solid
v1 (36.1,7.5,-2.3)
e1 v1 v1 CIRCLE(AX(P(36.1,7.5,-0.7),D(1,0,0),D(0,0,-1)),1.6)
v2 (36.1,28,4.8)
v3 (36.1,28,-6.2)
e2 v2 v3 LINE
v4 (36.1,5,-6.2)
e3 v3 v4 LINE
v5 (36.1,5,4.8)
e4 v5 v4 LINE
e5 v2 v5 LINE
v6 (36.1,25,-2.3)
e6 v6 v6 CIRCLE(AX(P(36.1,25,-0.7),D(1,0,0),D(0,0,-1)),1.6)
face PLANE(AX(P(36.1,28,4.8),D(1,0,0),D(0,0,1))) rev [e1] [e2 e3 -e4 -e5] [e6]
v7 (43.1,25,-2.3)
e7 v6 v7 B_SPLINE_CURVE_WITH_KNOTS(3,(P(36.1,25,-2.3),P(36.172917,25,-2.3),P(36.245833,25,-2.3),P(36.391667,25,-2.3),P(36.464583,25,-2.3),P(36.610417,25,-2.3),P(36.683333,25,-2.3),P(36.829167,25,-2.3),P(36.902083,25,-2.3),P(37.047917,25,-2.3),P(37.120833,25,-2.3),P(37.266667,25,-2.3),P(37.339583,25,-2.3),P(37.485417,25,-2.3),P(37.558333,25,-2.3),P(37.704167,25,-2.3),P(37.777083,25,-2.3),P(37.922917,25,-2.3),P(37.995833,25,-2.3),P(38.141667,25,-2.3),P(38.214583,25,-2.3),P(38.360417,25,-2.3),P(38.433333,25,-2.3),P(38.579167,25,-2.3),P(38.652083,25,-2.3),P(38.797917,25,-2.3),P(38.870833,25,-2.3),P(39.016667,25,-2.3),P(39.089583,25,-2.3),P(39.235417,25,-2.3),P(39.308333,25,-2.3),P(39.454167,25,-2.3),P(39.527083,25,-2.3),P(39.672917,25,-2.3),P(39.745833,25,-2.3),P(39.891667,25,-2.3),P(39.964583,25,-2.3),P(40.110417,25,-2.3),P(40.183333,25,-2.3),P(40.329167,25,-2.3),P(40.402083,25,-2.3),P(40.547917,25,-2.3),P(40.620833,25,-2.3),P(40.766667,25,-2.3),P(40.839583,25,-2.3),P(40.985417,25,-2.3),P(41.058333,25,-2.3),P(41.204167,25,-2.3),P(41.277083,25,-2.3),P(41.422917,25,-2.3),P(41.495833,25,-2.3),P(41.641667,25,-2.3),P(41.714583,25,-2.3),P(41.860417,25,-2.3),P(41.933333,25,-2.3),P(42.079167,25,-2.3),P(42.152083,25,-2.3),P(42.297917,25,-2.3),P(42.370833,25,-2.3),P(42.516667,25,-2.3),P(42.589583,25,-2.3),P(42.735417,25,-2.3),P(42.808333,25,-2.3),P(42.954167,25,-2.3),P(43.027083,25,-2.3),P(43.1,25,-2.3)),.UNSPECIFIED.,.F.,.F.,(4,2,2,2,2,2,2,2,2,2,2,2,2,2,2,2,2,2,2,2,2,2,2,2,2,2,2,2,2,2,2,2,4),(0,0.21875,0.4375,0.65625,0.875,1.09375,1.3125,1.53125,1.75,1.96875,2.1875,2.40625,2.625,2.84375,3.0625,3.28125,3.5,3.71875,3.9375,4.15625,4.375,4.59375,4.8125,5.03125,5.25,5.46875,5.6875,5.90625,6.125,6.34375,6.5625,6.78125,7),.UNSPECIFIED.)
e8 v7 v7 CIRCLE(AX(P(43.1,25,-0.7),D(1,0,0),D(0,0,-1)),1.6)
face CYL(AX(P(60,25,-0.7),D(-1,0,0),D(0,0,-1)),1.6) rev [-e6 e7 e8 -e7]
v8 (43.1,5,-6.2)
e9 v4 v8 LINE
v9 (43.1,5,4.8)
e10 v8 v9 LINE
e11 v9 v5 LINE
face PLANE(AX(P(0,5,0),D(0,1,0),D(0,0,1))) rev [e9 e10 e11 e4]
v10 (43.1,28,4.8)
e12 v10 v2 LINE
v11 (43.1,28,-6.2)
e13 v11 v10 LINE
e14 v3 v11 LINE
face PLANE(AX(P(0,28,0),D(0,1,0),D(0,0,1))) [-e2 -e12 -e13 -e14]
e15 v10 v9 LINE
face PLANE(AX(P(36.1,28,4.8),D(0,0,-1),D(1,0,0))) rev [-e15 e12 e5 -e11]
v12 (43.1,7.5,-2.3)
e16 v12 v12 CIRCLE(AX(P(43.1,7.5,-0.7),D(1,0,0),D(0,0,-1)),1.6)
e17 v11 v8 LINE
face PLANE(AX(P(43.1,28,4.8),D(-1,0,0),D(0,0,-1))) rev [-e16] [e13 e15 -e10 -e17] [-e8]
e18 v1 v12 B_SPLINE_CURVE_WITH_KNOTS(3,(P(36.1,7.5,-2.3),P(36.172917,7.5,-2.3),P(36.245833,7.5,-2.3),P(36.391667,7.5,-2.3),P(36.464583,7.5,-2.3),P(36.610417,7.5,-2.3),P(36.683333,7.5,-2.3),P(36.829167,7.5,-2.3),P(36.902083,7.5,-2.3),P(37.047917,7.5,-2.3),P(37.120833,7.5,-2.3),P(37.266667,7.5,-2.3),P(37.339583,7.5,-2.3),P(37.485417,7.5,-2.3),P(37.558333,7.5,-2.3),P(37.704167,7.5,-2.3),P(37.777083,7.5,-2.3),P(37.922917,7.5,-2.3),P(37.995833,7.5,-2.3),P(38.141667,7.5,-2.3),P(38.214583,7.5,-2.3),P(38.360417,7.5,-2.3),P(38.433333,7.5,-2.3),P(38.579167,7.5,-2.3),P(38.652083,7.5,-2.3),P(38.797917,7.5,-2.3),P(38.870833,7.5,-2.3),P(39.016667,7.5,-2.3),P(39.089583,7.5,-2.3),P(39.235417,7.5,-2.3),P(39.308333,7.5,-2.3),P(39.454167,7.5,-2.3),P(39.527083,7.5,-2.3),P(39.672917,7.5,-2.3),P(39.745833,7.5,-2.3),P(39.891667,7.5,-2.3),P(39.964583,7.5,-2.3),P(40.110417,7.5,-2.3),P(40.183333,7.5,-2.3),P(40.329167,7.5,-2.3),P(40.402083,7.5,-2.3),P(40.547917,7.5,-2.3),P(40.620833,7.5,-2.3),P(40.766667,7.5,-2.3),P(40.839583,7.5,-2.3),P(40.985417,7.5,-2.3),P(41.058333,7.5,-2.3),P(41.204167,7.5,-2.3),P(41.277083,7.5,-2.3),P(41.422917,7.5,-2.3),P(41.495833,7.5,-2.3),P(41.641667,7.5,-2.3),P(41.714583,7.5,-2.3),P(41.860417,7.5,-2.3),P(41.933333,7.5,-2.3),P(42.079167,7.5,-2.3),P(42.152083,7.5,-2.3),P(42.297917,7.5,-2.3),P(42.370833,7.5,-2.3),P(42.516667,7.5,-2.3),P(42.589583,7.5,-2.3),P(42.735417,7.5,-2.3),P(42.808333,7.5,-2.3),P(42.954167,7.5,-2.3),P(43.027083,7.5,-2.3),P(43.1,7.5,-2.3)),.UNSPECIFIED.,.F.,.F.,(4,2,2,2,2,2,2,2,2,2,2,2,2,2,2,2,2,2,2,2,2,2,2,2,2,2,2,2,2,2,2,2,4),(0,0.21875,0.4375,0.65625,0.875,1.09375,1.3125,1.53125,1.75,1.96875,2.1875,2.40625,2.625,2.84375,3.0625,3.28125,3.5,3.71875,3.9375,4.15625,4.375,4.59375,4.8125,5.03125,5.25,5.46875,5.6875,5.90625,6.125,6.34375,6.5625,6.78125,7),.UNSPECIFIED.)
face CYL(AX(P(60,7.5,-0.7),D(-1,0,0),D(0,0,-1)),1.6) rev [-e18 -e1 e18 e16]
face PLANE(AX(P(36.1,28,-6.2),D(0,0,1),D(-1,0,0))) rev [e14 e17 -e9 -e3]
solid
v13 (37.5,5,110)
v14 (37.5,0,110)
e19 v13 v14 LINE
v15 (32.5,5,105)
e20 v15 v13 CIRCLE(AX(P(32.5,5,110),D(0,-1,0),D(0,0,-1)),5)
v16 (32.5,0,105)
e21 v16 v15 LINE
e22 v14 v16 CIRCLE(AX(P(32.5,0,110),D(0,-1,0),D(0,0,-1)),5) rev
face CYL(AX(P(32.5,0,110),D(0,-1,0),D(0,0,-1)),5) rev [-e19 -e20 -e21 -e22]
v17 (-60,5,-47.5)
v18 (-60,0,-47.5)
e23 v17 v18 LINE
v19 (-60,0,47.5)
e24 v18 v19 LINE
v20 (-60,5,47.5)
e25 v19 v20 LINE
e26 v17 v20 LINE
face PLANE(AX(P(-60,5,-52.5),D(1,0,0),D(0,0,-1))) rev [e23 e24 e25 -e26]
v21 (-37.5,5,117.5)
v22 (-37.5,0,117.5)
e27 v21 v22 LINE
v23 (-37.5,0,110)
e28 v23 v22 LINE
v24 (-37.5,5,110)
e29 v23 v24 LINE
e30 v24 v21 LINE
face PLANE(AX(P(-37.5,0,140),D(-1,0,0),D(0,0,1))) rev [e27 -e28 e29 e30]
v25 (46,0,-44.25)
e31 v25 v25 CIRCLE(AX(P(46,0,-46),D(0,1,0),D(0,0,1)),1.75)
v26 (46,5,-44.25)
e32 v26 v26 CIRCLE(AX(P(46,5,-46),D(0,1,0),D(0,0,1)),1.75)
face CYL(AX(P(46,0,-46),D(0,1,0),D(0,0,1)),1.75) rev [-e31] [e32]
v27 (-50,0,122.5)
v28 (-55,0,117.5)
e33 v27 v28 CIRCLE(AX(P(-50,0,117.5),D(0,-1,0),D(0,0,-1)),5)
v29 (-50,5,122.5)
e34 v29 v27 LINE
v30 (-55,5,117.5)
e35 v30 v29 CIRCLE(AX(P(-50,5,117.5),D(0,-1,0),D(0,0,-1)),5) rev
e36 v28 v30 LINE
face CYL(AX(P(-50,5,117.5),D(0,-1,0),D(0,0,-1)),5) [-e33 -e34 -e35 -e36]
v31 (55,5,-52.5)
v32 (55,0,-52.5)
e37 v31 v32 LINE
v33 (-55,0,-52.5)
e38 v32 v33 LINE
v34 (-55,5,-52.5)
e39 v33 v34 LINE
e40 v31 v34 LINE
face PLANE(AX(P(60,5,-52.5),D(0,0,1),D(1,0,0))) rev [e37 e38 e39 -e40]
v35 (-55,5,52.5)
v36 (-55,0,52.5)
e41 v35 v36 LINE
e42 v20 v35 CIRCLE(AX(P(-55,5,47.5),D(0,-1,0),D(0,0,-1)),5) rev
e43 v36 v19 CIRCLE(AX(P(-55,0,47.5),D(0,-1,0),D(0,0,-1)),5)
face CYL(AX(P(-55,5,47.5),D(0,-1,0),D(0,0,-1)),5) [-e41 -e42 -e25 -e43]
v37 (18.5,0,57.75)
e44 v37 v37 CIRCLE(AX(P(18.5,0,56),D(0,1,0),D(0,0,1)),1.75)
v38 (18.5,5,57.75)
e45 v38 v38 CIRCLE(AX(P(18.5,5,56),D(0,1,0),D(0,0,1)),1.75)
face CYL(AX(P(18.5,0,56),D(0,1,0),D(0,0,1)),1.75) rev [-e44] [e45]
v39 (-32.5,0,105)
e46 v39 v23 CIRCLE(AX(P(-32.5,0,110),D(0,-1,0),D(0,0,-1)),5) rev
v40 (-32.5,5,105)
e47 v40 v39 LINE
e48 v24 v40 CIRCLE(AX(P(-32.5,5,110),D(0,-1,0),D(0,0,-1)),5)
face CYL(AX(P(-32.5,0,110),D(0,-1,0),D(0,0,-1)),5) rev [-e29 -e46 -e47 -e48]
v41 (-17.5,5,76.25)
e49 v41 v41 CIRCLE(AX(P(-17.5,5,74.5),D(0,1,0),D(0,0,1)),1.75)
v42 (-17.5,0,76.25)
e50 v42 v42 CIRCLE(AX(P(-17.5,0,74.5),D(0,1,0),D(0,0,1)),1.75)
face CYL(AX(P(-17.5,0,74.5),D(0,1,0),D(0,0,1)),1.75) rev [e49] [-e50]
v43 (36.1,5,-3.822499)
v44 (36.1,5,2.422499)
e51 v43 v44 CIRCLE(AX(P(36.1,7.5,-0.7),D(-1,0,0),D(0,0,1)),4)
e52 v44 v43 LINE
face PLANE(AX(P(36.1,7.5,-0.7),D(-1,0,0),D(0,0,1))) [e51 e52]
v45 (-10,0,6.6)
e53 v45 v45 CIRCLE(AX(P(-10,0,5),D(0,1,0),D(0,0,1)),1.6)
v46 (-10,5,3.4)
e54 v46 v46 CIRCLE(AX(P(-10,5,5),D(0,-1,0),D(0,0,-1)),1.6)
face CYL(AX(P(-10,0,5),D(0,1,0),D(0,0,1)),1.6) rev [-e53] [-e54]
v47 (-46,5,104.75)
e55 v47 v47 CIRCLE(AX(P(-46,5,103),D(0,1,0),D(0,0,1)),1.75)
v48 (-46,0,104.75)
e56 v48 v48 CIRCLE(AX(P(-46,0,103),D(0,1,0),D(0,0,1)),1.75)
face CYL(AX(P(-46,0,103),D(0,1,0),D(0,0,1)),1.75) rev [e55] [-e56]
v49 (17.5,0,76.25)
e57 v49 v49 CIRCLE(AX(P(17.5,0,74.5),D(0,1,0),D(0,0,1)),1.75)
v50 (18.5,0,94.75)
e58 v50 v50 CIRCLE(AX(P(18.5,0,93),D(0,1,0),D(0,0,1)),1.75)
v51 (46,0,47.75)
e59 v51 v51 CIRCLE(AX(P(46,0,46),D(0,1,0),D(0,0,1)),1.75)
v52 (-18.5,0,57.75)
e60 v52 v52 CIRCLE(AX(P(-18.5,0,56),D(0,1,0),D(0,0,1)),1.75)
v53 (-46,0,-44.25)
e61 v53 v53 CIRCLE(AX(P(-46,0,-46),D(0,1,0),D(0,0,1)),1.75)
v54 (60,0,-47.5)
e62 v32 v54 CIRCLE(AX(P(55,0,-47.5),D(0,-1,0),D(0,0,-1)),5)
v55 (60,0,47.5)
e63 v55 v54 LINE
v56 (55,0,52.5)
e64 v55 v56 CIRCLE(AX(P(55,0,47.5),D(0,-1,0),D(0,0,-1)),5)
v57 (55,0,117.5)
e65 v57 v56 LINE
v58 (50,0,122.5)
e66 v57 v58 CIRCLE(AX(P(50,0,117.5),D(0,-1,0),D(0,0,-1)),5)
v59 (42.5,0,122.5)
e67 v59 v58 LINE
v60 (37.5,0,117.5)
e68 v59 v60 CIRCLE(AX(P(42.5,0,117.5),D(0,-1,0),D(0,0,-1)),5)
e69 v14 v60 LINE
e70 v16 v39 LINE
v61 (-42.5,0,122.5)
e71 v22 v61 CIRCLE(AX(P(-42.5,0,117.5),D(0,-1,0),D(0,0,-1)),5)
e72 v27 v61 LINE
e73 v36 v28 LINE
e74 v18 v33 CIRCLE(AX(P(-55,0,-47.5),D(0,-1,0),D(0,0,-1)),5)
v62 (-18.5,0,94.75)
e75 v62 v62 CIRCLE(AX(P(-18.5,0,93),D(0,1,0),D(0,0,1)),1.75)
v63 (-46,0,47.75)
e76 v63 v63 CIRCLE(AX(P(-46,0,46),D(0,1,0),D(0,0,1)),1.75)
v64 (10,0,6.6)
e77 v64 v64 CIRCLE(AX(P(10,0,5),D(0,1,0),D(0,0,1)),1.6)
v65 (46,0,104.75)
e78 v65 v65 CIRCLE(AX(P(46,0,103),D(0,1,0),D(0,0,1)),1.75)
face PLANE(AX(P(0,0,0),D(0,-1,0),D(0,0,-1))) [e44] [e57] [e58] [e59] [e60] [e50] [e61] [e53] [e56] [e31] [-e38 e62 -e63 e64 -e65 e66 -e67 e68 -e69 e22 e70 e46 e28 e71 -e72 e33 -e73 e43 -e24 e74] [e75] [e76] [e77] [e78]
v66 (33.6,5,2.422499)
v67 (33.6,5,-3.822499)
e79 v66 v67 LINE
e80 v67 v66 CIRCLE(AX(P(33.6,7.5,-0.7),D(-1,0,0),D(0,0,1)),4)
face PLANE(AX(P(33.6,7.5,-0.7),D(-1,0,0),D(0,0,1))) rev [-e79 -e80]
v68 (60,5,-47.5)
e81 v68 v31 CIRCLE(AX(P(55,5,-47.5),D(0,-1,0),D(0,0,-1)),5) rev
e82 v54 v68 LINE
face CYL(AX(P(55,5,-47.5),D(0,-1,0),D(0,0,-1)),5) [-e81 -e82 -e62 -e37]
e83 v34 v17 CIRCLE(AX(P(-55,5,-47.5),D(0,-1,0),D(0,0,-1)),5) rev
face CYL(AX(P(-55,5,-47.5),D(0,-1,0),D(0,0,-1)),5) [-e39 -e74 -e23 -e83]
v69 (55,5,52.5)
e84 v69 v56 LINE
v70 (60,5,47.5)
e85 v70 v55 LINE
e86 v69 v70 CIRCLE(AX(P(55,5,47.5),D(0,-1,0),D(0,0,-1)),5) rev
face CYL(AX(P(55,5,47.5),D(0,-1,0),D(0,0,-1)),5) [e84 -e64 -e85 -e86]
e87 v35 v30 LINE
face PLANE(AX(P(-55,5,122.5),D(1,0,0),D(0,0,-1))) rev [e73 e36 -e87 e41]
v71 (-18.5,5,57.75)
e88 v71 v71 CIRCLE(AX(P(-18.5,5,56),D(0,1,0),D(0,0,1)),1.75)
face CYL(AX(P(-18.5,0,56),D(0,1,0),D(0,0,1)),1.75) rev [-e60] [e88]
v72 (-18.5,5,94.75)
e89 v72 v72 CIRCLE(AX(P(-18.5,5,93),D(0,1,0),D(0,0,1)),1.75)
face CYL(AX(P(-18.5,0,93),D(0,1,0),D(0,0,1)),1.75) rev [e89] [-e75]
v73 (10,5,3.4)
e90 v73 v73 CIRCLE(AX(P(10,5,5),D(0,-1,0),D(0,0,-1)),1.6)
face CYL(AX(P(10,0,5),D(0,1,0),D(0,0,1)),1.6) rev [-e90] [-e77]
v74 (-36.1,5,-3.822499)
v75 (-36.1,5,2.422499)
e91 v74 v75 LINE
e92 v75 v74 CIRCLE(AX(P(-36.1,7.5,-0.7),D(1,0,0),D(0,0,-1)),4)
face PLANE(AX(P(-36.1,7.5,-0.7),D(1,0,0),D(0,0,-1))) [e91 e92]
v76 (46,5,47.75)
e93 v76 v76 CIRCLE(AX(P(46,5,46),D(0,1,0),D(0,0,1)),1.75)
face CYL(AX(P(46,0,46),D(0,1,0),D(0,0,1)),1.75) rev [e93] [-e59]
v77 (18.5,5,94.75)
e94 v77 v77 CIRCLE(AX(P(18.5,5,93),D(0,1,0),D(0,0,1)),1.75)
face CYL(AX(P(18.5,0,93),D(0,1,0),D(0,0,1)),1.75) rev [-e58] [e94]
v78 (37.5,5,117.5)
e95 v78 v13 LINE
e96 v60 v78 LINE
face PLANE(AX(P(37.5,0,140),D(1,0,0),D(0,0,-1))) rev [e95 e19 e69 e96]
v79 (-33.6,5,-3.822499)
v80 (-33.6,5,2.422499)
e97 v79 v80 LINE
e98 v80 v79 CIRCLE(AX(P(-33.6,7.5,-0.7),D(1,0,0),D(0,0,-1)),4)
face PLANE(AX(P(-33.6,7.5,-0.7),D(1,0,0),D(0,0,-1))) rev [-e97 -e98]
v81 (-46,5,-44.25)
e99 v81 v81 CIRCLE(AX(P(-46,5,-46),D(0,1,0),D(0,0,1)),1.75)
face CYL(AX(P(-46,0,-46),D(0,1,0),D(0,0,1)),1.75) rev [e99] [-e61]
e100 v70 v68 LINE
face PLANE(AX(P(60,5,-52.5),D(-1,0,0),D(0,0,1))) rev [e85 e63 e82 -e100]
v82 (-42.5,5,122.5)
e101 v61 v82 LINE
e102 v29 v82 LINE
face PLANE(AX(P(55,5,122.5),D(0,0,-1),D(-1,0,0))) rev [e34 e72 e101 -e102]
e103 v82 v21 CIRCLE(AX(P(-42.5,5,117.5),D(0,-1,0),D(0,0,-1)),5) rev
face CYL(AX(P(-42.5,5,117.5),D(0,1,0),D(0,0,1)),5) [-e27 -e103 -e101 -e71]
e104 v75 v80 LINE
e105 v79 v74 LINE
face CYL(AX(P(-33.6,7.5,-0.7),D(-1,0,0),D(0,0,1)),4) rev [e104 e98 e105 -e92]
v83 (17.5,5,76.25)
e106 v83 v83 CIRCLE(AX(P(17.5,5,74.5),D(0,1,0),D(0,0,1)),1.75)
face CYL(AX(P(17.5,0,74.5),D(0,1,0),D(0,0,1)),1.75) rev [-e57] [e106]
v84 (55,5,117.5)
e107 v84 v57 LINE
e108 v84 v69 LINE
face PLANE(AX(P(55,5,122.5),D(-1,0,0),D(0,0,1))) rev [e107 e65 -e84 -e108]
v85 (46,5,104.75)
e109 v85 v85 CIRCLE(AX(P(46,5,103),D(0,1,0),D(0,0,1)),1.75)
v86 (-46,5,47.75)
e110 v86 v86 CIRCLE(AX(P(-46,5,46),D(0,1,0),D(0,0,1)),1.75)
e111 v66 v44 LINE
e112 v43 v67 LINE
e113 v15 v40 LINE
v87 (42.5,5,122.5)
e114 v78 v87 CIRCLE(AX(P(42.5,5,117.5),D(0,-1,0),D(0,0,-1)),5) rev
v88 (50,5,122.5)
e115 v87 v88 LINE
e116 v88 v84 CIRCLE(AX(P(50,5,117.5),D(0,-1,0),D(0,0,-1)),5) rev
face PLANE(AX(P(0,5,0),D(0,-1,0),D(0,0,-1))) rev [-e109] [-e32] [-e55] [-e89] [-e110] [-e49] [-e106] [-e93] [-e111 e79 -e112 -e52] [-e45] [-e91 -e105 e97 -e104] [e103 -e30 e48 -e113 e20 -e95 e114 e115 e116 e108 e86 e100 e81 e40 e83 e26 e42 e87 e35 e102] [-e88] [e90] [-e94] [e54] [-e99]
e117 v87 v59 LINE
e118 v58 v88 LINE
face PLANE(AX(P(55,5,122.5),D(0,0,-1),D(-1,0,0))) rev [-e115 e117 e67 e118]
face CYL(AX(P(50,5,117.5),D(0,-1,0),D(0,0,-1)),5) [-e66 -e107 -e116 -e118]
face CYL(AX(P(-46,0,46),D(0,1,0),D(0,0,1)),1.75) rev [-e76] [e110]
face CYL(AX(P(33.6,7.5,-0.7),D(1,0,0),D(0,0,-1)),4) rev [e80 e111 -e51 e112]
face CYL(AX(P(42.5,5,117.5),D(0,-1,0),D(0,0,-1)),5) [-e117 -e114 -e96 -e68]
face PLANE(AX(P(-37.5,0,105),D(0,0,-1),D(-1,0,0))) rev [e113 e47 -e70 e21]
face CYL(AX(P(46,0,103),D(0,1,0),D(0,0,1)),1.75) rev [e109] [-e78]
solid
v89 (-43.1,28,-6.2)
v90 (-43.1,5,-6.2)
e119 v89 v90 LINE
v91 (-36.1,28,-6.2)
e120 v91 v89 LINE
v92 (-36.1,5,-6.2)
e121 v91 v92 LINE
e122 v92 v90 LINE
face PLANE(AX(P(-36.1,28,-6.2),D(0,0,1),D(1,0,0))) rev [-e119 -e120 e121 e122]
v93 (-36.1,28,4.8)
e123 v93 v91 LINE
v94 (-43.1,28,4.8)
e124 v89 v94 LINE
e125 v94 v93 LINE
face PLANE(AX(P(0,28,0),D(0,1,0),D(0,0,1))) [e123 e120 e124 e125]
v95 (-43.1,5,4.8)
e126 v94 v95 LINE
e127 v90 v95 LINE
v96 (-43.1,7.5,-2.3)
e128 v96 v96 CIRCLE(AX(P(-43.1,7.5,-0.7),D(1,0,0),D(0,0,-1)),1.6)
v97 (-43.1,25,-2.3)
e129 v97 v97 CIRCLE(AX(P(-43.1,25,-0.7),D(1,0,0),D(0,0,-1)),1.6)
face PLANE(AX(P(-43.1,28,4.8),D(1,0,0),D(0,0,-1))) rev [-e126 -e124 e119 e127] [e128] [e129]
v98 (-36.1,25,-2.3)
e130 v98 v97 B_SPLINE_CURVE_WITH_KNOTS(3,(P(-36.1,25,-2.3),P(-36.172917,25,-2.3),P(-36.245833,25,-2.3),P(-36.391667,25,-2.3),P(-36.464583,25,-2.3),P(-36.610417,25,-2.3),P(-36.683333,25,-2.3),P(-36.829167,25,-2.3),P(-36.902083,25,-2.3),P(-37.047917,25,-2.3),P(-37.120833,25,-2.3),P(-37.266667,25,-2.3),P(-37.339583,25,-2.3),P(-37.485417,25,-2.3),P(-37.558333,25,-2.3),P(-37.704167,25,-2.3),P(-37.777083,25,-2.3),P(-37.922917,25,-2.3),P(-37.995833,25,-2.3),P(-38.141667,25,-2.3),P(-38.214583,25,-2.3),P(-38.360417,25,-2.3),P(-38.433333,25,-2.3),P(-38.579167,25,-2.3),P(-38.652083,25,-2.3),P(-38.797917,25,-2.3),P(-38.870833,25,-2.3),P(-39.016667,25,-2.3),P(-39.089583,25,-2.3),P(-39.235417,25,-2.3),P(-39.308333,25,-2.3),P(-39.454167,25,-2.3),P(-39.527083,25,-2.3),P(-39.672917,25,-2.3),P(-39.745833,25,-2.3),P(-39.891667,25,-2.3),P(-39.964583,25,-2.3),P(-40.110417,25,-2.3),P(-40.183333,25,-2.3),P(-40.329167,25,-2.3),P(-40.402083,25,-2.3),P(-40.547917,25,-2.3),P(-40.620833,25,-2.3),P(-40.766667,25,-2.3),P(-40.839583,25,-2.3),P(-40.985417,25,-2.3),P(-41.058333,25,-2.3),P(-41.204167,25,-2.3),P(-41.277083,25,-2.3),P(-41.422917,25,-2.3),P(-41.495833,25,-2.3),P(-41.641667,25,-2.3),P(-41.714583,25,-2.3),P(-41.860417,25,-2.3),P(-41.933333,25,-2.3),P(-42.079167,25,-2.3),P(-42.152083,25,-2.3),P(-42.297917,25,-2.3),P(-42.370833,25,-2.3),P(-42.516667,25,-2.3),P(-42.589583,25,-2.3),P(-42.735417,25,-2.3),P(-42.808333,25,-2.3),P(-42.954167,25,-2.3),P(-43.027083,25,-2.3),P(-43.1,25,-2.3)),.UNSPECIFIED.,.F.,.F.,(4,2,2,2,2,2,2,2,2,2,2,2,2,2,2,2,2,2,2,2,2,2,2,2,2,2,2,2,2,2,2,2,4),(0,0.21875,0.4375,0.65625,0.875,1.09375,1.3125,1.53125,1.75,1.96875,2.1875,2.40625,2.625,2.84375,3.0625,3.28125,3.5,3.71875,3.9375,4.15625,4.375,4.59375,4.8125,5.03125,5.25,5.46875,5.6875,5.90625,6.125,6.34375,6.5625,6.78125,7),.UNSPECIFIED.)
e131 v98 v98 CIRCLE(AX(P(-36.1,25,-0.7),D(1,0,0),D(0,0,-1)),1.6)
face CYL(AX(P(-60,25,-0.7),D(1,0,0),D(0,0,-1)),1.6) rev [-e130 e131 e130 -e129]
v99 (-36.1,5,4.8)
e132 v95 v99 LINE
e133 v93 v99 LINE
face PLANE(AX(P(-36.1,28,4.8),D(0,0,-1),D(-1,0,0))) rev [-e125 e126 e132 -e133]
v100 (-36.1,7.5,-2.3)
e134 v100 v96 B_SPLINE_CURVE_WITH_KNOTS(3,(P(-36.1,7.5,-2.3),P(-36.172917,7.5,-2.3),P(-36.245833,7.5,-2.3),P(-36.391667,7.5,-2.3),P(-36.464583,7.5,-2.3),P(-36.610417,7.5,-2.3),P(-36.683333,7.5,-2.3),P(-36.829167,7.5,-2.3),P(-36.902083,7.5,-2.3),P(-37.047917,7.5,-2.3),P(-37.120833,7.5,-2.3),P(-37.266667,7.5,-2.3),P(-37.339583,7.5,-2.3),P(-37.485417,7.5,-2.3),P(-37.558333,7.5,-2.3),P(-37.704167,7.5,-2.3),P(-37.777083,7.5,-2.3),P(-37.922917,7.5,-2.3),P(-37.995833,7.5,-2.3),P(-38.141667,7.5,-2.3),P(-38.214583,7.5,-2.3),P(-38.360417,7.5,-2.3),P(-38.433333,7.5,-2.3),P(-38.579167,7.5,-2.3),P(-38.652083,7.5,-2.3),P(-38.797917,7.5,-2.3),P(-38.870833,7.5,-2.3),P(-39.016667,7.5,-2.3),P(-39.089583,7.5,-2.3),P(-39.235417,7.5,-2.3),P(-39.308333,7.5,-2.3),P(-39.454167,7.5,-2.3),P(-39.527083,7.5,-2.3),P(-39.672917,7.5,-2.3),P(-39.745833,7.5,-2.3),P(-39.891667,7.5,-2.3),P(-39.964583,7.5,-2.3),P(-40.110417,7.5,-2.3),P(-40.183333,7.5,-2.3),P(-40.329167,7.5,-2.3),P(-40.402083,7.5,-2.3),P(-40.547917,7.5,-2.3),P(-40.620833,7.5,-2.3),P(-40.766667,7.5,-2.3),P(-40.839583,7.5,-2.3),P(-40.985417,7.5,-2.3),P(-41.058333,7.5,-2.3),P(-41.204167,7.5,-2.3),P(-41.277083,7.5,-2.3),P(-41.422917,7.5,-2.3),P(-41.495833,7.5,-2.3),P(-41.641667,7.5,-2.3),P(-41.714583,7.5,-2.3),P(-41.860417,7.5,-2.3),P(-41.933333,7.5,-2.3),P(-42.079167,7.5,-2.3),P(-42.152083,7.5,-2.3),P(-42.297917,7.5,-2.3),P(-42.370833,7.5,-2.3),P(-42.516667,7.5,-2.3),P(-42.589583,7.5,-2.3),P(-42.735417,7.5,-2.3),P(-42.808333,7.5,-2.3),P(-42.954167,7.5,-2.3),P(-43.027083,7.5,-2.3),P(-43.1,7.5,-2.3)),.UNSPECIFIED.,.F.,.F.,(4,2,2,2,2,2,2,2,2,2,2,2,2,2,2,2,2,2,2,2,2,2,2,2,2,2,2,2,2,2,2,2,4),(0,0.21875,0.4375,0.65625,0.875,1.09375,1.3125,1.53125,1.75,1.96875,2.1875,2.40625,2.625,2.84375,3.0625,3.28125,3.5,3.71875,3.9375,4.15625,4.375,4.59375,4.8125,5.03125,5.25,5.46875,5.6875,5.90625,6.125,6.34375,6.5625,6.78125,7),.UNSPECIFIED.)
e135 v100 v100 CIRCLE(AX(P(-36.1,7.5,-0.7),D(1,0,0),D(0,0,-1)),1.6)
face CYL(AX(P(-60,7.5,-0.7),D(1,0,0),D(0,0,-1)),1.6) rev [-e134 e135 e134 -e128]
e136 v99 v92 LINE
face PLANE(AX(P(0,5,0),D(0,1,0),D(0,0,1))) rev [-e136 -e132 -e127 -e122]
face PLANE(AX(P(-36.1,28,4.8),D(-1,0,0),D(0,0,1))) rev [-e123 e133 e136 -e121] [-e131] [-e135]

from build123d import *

# Parameters (mm, degrees)
EXTRUDE_1_DEPTH             = 5
SKETCH_2_W                  = 7
SKETCH_2_H                  = 11
EXTRUDE_2_DEPTH             = 23
SKETCH_3_R                  = 1.6
CUT_EXTRUDE_1_DEPTH         = 159.19437411
SKETCH_5_R                  = 1.75
CUT_EXTRUDE_1416_DEPTH      = 139.330220849
SKETCH2_R                   = 4
CUT_EXTRUDE1_DEPTH          = 2.5
CUT_EXTRUDE2_START          = 2.5
SKETCH3_R                   = 4
CUT_EXTRUDE2_DEPTH          = 2.5
CUT_EXTRUDE_2297_DEPTH      = 139.330220849
CUT_EXTRUDE_2297_DEPTH_BACK = 139.330220849
SKETCH4_R                   = 1.6
SKETCH6_R                   = 1.75
CUT_EXTRUDE_2671_DEPTH      = 139.330220849
SKETCH7_R                   = 1.75
CUT_EXTRUDE_3080_DEPTH      = 139.330220849
SKETCH9_R                   = 1.75
CUT_EXTRUDE_3618_DEPTH      = 139.330220849
SKETCH8_W                   = 75
SKETCH8_H                   = 35
CUT_EXTRUDE7_DEPTH          = 139.330220849
FILLET_1_R                  = 5
FILLET2_R                   = 5


with BuildPart() as part:
    # 스케치1 → 보스-돌출1 (new body)
    with BuildSketch(Plane(origin=(0, 0, 0), x_dir=(1, 0, 0), z_dir=(0, 1, 0))):
        Polygon((-55, -52.5), (-60, -52.5), (-60, 52.5), (60, 52.5), (60, -52.5), (55, -52.5), (55, -122.5), (-55, -122.5), align=None)
    extrude(amount=EXTRUDE_1_DEPTH)

    # 스케치5 → Cut-Extrude 1416 (cut, through all)
    with BuildSketch(Plane(origin=(0, 5, 0), x_dir=(1, 0, 0), z_dir=(0, 1, 0))):
        with Locations(Location((-46, -46, 0), (0, 0, 270))):
            Circle(SKETCH_5_R)
        with Locations(Location((-46, 46, 0), (0, 0, 270))):
            Circle(SKETCH_5_R)
        with Locations(Location((46, 46, 0), (0, 0, 270))):
            Circle(SKETCH_5_R)
        with Locations(Location((46, -46, 0), (0, 0, 270))):
            Circle(SKETCH_5_R)
    extrude(amount=-CUT_EXTRUDE_1416_DEPTH, mode=Mode.SUBTRACT)

    # Sketch2 → Cut-Extrude1 (cut)
    with BuildSketch(Plane.ZY.offset(-36.1)):
        with Locations((-0.7, 7.5)):
            Circle(SKETCH2_R)
    extrude(amount=CUT_EXTRUDE1_DEPTH, mode=Mode.SUBTRACT)

    # Sketch3 → Cut-Extrude2 (cut)
    with BuildSketch(Plane(origin=(-36.1, 0, 0), x_dir=(0, 0, -1), z_dir=(1, 0, 0)).offset(CUT_EXTRUDE2_START)):
        with Locations((0.7, 7.5)):
            Circle(SKETCH3_R)
    extrude(amount=-CUT_EXTRUDE2_DEPTH, mode=Mode.SUBTRACT)

    # Sketch4 → Cut-Extrude 2297 (cut, two sides: drawn at the far end of the back side and taken through both)
    with BuildSketch(Plane(origin=(0, 5, 0), x_dir=(1, 0, 0), z_dir=(0, 1, 0)).offset(-CUT_EXTRUDE_2297_DEPTH_BACK)):
        with Locations(Location((-10, -5, 0), (0, 0, 270))):
            Circle(SKETCH4_R)
        with Locations(Location((10, -5, 0), (0, 0, 270))):
            Circle(SKETCH4_R)
    extrude(amount=CUT_EXTRUDE_2297_DEPTH + CUT_EXTRUDE_2297_DEPTH_BACK, mode=Mode.SUBTRACT)

    # Sketch6 → Cut-Extrude 2671 (cut, through all)
    with BuildSketch(Plane(origin=(0, 5, 0), x_dir=(1, 0, 0), z_dir=(0, 1, 0))):
        with Locations(Location((-18.5, -93, 0), (0, 0, 270))):
            Circle(SKETCH6_R)
        with Locations(Location((-18.5, -56, 0), (0, 0, 270))):
            Circle(SKETCH6_R)
        with Locations(Location((18.5, -56, 0), (0, 0, 270))):
            Circle(SKETCH6_R)
        with Locations(Location((18.5, -93, 0), (0, 0, 270))):
            Circle(SKETCH6_R)
    extrude(amount=-CUT_EXTRUDE_2671_DEPTH, mode=Mode.SUBTRACT)

    # Sketch7 → Cut-Extrude 3080 (cut, through all)
    with BuildSketch(Plane(origin=(0, 5, 0), x_dir=(1, 0, 0), z_dir=(0, 1, 0))):
        with Locations(Location((-46, -103, 0), (0, 0, 270))):
            Circle(SKETCH7_R)
        with Locations(Location((46, -103, 0), (0, 0, 270))):
            Circle(SKETCH7_R)
    extrude(amount=-CUT_EXTRUDE_3080_DEPTH, mode=Mode.SUBTRACT)

    # Sketch9 → Cut-Extrude 3618 (cut, through all)
    with BuildSketch(Plane(origin=(0, 5, 0), x_dir=(1, 0, 0), z_dir=(0, 1, 0))):
        with Locations(Location((-17.5, -74.5, 0), (0, 0, 270))):
            Circle(SKETCH9_R)
        with Locations(Location((17.5, -74.5, 0), (0, 0, 270))):
            Circle(SKETCH9_R)
    extrude(amount=-CUT_EXTRUDE_3618_DEPTH, mode=Mode.SUBTRACT)

    # Sketch8 → Cut-Extrude7 (cut, through all)
    with BuildSketch(Plane(origin=(0, 5, 0), x_dir=(1, 0, 0), z_dir=(0, 1, 0))):
        with Locations((0, -122.5)):
            Rectangle(SKETCH8_W, SKETCH8_H)
    extrude(amount=-CUT_EXTRUDE7_DEPTH, mode=Mode.SUBTRACT)

    # 필렛1
    fillet_1_edges = [part.edges().sort_by_distance(p)[0] for p in [
        (37.5, 2.5, 122.5),
        (37.5, 2.5, 105),
        (-37.5, 2.5, 122.5),
        (-37.5, 2.5, 105),
        (-60, 2.5, -52.5),
        (60, 2.5, -52.5),
        (55, 2.5, 122.5),
        (-55, 2.5, 122.5),
    ]]
    fillet(fillet_1_edges, radius=FILLET_1_R)

    # Fillet2
    fillet2_edges = [part.edges().sort_by_distance(p)[0] for p in [
        (60, 2.5, 52.5),
        (-60, 2.5, 52.5),
    ]]
    fillet(fillet2_edges, radius=FILLET2_R - 0.0001)  # a hair under: the kernel refuses the full size


with BuildPart() as body_2:
    # 스케치2 → 보스-돌출2 (new body)
    with BuildSketch(Plane(origin=(0, 5, 0), x_dir=(1, 0, 0), z_dir=(0, 1, 0))):
        with Locations((-39.6, 0.7)):
            Rectangle(SKETCH_2_W, SKETCH_2_H)
    extrude(amount=EXTRUDE_2_DEPTH)

    # 스케치3 → 컷-돌출1 (cut, through all)
    with BuildSketch(Plane(origin=(-36.1, 0, 0), x_dir=(0, 0, -1), z_dir=(1, 0, 0))):
        with Locations((0.7, 25)):
            Circle(SKETCH_3_R)
        with Locations((0.7, 7.5)):
            Circle(SKETCH_3_R)
    extrude(amount=-CUT_EXTRUDE_1_DEPTH, mode=Mode.SUBTRACT)


with BuildPart() as body_3:
    # 대칭 복사1: mirrored copy
    add(body_2.part.mirror(Plane(origin=(0, 0, 0), x_dir=(0, 0, 1), z_dir=(1, 0, 0))))


solid = Compound([part.part, body_2.part, body_3.part])
